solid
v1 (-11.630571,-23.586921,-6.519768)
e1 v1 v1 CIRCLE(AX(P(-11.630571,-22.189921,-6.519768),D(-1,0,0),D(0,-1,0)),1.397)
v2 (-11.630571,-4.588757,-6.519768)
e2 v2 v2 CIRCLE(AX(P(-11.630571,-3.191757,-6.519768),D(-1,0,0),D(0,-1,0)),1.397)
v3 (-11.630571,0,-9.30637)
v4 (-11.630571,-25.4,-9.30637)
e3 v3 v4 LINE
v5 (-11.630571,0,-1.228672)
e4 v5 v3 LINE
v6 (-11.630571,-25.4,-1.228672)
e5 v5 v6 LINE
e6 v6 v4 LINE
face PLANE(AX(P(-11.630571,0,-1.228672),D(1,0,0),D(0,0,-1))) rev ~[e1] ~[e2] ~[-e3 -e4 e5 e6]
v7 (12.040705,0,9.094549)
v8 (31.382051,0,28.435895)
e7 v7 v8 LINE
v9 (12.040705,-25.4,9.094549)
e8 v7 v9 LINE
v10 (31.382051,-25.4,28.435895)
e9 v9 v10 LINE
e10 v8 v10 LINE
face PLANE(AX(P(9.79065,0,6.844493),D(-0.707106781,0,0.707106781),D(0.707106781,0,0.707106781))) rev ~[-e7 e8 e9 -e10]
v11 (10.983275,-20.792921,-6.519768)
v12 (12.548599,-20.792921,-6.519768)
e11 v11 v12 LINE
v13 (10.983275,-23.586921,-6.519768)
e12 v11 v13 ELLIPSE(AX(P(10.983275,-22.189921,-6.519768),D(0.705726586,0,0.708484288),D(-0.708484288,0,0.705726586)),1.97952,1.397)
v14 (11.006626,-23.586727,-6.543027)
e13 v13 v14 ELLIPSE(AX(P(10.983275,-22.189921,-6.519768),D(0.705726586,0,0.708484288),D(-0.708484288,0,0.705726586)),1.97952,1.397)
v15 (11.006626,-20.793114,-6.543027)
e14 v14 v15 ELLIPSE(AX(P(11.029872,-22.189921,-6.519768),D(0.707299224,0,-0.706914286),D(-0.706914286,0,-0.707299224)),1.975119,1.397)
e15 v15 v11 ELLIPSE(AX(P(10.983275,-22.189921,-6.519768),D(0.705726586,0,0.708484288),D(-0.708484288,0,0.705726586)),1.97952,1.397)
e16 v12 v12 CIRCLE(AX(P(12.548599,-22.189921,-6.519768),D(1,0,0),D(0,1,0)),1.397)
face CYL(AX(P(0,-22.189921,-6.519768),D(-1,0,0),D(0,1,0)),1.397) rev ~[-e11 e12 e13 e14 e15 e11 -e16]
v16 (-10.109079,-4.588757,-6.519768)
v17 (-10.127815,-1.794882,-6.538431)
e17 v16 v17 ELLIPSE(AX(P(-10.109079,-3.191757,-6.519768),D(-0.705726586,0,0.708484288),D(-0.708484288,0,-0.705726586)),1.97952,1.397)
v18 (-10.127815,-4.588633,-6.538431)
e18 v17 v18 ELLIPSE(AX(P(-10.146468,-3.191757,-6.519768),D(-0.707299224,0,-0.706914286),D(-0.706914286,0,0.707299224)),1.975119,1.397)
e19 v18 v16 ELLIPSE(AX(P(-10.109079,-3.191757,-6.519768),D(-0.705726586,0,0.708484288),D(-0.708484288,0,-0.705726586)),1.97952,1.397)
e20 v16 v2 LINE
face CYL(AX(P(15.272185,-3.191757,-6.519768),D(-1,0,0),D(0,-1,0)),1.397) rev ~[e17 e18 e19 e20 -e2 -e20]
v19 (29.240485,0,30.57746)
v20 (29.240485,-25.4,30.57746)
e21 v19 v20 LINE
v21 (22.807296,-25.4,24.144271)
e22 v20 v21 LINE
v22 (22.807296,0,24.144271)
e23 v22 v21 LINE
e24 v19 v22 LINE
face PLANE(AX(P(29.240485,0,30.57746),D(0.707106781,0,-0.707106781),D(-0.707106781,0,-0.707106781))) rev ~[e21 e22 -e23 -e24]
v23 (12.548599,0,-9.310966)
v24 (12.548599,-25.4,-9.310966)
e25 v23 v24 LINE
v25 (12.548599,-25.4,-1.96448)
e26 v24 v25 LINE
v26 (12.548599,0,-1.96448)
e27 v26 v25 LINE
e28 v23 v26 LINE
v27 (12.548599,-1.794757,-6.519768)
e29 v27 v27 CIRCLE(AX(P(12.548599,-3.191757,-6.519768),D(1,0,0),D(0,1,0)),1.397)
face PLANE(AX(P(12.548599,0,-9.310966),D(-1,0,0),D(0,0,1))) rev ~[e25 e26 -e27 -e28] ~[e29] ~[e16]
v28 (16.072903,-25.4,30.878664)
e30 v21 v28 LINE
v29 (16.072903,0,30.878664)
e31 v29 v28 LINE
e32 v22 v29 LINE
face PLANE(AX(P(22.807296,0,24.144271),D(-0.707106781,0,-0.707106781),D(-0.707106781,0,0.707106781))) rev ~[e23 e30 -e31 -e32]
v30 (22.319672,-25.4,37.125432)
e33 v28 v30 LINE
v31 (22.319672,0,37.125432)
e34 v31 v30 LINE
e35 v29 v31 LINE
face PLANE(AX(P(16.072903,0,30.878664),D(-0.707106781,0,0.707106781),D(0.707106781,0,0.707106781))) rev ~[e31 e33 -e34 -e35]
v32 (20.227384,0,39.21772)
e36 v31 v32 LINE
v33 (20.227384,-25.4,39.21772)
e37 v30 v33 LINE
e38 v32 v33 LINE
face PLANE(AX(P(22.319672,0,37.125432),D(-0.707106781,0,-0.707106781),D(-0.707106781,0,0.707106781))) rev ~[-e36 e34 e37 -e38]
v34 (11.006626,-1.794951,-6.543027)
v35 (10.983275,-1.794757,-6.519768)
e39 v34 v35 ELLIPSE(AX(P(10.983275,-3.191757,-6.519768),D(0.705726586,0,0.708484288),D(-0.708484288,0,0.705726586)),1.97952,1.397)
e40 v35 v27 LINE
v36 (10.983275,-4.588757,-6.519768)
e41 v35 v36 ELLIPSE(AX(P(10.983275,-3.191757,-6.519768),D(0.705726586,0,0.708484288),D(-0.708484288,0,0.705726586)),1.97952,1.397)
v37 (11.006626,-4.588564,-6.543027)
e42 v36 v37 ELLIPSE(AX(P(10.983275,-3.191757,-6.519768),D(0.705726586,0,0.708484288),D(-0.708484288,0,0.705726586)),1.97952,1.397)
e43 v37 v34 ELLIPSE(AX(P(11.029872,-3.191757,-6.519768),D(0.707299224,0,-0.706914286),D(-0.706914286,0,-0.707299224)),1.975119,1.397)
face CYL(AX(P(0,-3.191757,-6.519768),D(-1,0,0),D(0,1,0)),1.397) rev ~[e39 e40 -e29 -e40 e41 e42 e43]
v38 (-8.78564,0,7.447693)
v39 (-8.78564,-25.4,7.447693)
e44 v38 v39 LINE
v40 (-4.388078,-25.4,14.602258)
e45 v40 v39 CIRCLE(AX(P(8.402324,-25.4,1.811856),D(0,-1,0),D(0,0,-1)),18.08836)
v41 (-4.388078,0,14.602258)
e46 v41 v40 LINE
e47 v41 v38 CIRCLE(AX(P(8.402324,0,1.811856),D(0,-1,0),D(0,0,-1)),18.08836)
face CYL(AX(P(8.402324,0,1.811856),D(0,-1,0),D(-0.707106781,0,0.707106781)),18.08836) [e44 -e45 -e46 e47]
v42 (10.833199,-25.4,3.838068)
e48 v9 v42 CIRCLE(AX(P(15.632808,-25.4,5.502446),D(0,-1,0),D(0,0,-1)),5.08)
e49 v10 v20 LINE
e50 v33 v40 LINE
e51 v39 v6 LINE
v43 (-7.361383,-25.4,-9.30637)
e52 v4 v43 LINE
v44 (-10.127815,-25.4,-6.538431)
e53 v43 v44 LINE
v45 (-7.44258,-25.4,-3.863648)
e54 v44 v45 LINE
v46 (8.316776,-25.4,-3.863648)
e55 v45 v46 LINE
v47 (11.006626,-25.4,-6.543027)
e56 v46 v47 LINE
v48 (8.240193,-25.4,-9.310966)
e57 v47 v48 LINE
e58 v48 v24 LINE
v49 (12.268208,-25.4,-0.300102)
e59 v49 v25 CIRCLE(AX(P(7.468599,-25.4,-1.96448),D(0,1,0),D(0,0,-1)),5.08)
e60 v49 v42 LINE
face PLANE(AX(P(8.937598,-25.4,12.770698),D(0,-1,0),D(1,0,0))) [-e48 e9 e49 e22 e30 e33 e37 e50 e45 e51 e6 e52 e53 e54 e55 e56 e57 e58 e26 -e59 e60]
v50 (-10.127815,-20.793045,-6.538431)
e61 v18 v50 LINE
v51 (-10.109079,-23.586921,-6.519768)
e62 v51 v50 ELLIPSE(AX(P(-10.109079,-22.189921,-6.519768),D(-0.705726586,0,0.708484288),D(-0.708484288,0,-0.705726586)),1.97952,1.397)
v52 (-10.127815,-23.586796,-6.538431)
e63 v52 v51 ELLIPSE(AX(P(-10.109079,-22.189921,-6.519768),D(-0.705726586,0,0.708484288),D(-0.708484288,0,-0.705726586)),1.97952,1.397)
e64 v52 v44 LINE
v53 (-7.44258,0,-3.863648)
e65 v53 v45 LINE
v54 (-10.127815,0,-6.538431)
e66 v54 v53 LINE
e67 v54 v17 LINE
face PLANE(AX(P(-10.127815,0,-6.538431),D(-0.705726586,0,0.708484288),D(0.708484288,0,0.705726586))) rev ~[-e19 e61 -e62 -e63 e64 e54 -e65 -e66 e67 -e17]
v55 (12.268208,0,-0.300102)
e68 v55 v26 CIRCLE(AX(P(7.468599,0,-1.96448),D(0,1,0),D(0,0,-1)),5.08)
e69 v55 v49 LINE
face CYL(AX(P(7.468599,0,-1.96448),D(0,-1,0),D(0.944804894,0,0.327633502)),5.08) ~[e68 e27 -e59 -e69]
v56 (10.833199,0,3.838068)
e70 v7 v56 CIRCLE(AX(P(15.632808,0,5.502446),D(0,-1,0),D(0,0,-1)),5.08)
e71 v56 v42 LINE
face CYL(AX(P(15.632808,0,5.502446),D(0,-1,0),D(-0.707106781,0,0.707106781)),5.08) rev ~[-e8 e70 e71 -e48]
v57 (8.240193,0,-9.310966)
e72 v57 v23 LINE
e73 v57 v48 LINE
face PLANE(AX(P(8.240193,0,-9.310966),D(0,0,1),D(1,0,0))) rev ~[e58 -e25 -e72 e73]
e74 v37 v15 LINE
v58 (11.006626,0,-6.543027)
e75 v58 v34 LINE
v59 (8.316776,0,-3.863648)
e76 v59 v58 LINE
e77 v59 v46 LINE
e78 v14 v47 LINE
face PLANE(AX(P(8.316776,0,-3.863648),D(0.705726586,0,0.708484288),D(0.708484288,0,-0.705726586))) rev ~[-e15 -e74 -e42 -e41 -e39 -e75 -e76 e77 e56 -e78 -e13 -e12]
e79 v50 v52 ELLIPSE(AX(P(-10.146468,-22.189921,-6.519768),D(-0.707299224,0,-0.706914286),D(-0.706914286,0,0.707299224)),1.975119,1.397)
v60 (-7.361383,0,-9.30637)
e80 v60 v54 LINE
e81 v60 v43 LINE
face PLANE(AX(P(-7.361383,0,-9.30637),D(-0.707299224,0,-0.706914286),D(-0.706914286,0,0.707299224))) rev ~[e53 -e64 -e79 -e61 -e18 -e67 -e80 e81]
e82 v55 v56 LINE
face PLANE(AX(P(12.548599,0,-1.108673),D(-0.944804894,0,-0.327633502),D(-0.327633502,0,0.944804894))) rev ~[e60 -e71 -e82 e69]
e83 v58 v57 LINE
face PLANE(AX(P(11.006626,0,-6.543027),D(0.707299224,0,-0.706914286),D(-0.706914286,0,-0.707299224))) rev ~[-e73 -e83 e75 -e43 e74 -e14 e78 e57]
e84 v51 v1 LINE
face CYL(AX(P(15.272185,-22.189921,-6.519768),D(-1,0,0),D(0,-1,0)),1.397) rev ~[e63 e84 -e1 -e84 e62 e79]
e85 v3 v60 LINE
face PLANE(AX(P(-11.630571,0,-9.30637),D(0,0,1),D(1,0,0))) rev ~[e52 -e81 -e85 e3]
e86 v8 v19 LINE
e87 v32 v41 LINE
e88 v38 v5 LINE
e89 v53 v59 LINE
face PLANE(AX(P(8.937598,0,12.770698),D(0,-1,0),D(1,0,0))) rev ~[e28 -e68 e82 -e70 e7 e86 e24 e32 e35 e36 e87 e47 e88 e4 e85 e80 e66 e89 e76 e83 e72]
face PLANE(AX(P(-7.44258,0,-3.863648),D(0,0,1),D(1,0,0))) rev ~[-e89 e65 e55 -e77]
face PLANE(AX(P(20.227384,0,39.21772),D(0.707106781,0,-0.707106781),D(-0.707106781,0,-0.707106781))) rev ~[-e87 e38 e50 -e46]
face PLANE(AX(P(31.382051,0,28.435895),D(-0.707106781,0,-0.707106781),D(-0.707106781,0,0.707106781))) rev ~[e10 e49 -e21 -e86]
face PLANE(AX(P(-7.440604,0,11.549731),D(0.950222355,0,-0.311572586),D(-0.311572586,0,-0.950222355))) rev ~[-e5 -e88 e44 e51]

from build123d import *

# Parameters (mm, degrees)
F1_DEPTH = 25.4
F3_D     = 2.794
F3_DEPTH = 25.4
F3_TIP   = 0.8394022848
F4_D     = 2.794
F4_DEPTH = 25.4
F4_START = 10.1278152
F4_TIP   = 0.8394022848
F5_R     = 18.0883597705
F6_R     = 5.08


# Not quite as in the source:
# - ends of sketch curves that miss each other by under 0.0002 mm in the source are joined
# - a feature names something its author has since deleted; it is built from what else it names


with BuildPart() as f1:
    # F0 (on Front) → F1 (new body)
    with BuildSketch(Plane.XZ):
        Polygon((11.0066256276, -6.5430273301), (8.240193387, -9.310965985), (12.5485987193, -9.310965985), (12.5485987193, -1.1086727812), (9.7906497979, 6.8444932552), (24.9488617122, 22.0027051695), (31.3820510637, 28.435894521), (29.2404852808, 30.5774603039), (22.8072959293, 24.1442709524), (16.0729033236, 30.8786635582), (22.3196721338, 37.1254323684), (20.2273843878, 39.2177201144), (14.0302290969, 33.0205648235), (13.9806155776, 32.9709513042), (-7.4406042695, 11.5497314571), (-11.6305711889, -1.2286720797), (-11.6305711889, -9.3063699081), (-7.3613829189, -9.3063699081), (-10.1278151595, -6.5384312532), (-7.4425795762, -3.8636476732), (8.3167760077, -3.8636476732), align=None)
    extrude(amount=F1_DEPTH)

    # F3 (one way)
    with BuildSketch(Plane(origin=(0, 0, 0), x_dir=(0, 1, 0), z_dir=(-1, 0, 0))):
        with Locations((-22.1899207681, 6.5197679214), (-3.1917574815, 6.5197679214)):
            Circle(F3_D / 2)
    extrude(amount=-F3_DEPTH, mode=Mode.SUBTRACT)
    with Locations(Plane(origin=(0, 0, 0), x_dir=(0, 1, 0), z_dir=(-1, 0, 0))):
        with Locations((-22.1899207681, 6.5197679214), (-3.1917574815, 6.5197679214)):
            with Locations((0, 0, -(F3_DEPTH + F3_TIP / 2))):  # 118° drill point
                Cone(0, F3_D / 2, F3_TIP, mode=Mode.SUBTRACT)

    # F4
    # its depths count from where the whole tool has entered the part; down to there all is cleared
    with Locations(Plane.YZ.offset(-F4_START)):
        with Locations((-3.1917574815, -6.5197679214), (-22.1899207681, -6.5197679214)):
            Hole(F4_D / 2, depth=F4_DEPTH)
            with Locations((0, 0, -(F4_DEPTH + F4_TIP / 2))):  # 118° drill point
                Cone(0, F4_D / 2, F4_TIP, mode=Mode.SUBTRACT)

    # F5
    f5_edges = [f1.edges().sort_by_distance(p)[0] for p in [
        (-7.440604, -12.7, 11.549731),
    ]]
    fillet(f5_edges, radius=F5_R)

    # F6
    f6_edges = [f1.edges().sort_by_distance(p)[0] for p in [
        (9.79065, -12.7, 6.844493),
        (12.548599, -12.7, -1.108673),
    ]]
    fillet(f6_edges, radius=F6_R)


solid = f1.part
